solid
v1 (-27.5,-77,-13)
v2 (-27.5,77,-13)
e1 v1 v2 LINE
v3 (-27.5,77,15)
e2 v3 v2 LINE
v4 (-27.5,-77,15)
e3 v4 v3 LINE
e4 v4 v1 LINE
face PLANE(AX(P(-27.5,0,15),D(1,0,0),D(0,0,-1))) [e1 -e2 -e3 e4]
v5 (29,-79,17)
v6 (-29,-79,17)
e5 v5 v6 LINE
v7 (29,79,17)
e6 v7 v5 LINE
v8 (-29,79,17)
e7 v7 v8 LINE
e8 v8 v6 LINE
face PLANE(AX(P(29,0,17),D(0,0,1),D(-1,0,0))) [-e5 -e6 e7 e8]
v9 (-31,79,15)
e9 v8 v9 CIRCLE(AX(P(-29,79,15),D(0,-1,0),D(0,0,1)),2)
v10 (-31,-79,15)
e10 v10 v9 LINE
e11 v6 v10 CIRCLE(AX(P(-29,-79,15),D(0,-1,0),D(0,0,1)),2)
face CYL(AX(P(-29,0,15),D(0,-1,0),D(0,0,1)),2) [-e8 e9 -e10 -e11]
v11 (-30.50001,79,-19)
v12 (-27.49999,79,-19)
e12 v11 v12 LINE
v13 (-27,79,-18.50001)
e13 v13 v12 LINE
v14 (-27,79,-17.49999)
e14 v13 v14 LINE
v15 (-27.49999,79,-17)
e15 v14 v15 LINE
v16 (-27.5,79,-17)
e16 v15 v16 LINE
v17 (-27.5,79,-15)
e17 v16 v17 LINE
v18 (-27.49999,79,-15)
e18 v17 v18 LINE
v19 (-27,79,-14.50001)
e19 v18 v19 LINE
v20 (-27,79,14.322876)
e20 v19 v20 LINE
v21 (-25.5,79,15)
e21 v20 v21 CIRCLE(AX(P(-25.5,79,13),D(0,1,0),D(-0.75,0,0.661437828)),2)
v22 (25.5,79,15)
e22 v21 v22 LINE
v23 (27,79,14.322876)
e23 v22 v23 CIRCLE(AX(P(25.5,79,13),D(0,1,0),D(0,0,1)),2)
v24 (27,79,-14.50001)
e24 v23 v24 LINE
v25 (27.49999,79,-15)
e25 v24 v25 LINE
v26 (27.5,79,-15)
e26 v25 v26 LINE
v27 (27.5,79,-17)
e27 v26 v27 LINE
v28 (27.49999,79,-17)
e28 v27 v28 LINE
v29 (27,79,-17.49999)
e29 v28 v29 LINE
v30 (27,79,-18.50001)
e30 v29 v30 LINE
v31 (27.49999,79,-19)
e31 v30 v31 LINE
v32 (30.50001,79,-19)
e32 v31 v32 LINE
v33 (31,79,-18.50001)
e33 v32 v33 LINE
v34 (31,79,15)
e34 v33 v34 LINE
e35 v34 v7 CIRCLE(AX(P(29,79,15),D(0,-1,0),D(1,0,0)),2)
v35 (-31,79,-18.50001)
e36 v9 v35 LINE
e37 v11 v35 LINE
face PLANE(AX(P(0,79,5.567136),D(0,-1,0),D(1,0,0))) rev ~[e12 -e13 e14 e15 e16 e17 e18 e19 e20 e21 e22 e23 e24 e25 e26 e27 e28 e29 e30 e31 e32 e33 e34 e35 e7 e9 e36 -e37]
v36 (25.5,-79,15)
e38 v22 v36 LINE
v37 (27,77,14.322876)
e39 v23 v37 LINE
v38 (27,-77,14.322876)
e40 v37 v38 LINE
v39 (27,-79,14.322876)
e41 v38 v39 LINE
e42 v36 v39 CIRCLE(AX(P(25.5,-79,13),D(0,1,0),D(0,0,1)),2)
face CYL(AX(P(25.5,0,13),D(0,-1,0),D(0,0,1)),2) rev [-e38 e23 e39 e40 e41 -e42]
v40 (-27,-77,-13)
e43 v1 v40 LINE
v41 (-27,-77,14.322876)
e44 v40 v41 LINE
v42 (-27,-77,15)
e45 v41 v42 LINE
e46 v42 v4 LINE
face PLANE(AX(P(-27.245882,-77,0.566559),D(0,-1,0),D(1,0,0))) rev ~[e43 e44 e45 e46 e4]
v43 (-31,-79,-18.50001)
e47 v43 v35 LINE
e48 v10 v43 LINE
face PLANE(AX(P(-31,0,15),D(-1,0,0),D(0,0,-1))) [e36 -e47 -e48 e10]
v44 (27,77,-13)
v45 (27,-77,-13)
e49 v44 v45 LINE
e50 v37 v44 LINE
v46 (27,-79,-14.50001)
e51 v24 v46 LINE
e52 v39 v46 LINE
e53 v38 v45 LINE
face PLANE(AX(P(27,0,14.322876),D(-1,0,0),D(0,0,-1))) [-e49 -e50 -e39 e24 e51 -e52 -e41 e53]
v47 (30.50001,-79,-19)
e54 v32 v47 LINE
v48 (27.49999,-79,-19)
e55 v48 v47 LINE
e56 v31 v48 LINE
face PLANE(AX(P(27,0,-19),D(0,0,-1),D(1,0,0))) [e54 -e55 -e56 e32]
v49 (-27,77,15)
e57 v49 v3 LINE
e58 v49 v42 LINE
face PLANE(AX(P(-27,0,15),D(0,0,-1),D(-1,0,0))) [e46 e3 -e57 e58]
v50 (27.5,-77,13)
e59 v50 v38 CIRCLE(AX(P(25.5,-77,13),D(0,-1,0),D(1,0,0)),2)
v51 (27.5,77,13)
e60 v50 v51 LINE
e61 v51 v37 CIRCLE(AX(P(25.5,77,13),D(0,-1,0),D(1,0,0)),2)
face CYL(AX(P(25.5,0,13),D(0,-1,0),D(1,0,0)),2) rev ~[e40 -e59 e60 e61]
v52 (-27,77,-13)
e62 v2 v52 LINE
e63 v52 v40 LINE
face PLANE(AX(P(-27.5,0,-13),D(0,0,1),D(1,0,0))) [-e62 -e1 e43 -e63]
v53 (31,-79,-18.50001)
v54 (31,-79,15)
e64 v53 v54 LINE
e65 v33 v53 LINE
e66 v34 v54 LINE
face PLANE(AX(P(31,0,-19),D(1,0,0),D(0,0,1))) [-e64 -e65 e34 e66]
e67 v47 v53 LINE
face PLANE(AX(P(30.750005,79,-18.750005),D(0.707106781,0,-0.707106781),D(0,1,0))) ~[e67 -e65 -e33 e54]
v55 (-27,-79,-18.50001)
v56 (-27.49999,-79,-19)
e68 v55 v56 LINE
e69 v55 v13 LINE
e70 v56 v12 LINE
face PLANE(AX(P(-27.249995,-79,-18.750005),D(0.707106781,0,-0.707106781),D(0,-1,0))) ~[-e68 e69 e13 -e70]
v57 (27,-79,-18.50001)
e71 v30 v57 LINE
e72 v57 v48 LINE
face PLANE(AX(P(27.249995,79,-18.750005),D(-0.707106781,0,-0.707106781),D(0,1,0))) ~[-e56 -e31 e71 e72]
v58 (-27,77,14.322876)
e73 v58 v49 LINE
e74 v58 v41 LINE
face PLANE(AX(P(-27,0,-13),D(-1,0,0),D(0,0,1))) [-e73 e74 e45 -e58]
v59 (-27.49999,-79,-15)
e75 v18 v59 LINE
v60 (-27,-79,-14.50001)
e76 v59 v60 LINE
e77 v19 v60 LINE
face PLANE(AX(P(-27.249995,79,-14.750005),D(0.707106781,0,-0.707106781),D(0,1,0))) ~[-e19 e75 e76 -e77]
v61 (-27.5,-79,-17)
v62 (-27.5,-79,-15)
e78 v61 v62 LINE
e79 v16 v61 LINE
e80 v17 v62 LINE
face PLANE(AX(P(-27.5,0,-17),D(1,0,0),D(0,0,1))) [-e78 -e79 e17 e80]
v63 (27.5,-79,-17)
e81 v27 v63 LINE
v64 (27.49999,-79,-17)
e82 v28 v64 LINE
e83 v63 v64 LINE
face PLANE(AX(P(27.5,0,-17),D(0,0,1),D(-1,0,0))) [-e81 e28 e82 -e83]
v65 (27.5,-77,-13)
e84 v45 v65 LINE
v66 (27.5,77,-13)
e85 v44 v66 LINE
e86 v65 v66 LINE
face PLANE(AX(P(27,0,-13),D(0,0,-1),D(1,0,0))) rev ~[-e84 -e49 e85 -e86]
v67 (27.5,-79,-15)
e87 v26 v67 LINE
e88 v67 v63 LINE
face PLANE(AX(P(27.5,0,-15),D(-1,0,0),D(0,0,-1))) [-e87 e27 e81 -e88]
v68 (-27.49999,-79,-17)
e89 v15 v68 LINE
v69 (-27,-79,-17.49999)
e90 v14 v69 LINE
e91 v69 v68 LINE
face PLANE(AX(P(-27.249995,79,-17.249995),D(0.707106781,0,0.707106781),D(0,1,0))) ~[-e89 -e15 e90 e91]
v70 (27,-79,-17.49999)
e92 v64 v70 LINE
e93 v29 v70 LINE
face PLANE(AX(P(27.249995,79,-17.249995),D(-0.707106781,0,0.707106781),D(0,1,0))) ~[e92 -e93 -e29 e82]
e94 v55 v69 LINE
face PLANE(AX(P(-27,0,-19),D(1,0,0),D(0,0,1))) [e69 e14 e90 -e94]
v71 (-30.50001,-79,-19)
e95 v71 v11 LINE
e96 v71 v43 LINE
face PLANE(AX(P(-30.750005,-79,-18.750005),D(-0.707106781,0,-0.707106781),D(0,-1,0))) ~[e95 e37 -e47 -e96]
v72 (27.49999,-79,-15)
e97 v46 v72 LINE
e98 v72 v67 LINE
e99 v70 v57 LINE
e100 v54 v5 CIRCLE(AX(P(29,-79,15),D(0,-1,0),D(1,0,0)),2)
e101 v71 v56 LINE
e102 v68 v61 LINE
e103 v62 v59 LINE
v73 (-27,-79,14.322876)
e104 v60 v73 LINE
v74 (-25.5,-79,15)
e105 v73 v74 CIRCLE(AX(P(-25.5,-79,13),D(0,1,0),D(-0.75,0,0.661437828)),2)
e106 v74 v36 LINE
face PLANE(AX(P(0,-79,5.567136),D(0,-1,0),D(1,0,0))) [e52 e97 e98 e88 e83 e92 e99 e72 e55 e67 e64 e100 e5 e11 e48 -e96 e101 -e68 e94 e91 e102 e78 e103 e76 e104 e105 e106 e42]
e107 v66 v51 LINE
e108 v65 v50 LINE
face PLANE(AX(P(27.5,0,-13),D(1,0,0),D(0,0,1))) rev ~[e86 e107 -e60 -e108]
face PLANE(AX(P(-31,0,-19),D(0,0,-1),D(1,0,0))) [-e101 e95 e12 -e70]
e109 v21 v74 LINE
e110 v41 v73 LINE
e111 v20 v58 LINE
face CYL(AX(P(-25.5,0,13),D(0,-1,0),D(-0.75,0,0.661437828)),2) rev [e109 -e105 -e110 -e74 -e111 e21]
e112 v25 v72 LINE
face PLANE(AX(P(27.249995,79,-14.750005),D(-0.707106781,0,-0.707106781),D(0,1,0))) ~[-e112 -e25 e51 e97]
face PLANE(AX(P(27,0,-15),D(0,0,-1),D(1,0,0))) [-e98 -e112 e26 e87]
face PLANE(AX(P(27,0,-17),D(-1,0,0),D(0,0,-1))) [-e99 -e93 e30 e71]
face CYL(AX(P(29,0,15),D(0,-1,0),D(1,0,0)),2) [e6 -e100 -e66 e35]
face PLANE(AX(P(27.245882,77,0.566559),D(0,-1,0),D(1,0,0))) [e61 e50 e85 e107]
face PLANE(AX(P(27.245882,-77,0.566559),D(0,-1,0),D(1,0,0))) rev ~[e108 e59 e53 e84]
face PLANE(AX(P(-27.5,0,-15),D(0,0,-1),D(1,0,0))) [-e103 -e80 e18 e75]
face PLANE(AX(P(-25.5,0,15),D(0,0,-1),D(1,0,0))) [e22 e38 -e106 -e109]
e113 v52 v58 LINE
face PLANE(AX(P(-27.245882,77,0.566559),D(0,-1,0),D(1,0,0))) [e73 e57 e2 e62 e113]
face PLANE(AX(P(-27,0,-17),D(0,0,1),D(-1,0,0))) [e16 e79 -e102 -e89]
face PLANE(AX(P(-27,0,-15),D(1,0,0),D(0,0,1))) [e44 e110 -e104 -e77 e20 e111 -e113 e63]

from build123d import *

# Parameters (mm, degrees)
F2_W     = 0.5
F2_H     = 2
F3_DEPTH = 79
F4_DEPTH = 77
F5_SIZE  = 0.49999


# Not quite as in the source:
# - a fillet or chamfer is up to 0.001 mm smaller than in the source, because OpenCascade refuses the exact size


with BuildPart() as f3:
    # F2 (on Front) → F3 (new body, symmetric)
    with BuildSketch(Plane.XZ):
        with BuildLine():
            Line((-27, -19), (-27, -17))
            Line((-27, -17), (-27.5, -17))
            Line((-27.5, -17), (-27.5, -15))
            Line((-27.5, -15), (-27.5, -13))
            Line((-27.5, -13), (-27.5, 13))
            Line((-27.5, 13), (-27.5, 15))
            Line((-27.5, 15), (-27, 15))
            Line((-27, 15), (-25.5, 15))
            Line((-25.5, 15), (0, 15))
            Line((0, 15), (25.5, 15))
            Line((25.5, 15), (27, 15))
            Line((27, 15), (27.5, 15))
            Line((27.5, 15), (27.5, 13))
            Line((27.5, 13), (27.5, -13))
            Line((27.5, -13), (27.5, -15))
            Line((27.5, -15), (27.5, -17))
            Line((27.5, -17), (27, -17))
            Line((27, -17), (27, -19))
            Line((27, -19), (31, -19))
            Line((31, -19), (31, 15))
            ThreePointArc((31, 15), (30.4142135624, 16.4142135624), (29, 17))
            Line((29, 17), (0, 17))
            Line((0, 17), (-29, 17))
            ThreePointArc((-29, 17), (-30.4142135624, 16.4142135624), (-31, 15))
            Line((-31, 15), (-31, -19))
            Line((-31, -19), (-27, -19))
        make_face()
        with Locations((-27.25, -14)):
            Rectangle(F2_W, F2_H)
        with BuildLine():
            Line((-27.5, 13), (-27.5, -13))
            Line((-27.5, -13), (-27, -13))
            Line((-27, -13), (-27, 14.3228756555))
            ThreePointArc((-27, 14.3228756555), (-27.3708286934, 13.7071067812), (-27.5, 13))
        make_face()
        with BuildLine():
            Line((-27.5, 15), (-27.5, 13))
            ThreePointArc((-27.5, 13), (-27.3708286934, 13.7071067812), (-27, 14.3228756555))
            Line((-27, 14.3228756555), (-27, 15))
            Line((-27, 15), (-27.5, 15))
        make_face()
        with BuildLine():
            Line((-27, 15), (-27, 14.3228756555))
            ThreePointArc((-27, 14.3228756555), (-26.3228756555, 14.8228756555), (-25.5, 15))
            Line((-25.5, 15), (-27, 15))
        make_face()
        with BuildLine():
            Line((27, 15), (25.5, 15))
            ThreePointArc((25.5, 15), (26.3228756555, 14.8228756555), (27, 14.3228756555))
            Line((27, 14.3228756555), (27, 15))
        make_face()
        with BuildLine():
            Line((27.5, 15), (27, 15))
            Line((27, 15), (27, 14.3228756555))
            ThreePointArc((27, 14.3228756555), (27.3708286934, 13.7071067812), (27.5, 13))
            Line((27.5, 13), (27.5, 15))
        make_face()
        with BuildLine():
            ThreePointArc((27.5, 13), (27.3708286934, 13.7071067812), (27, 14.3228756555))
            Line((27, 14.3228756555), (27, -13))
            Line((27, -13), (27.5, -13))
            Line((27.5, -13), (27.5, 13))
        make_face()
        with Locations((27.25, -14)):
            Rectangle(F2_W, F2_H)
    extrude(amount=F3_DEPTH, both=True)

    # F2 (on Front) → F4 (cut, symmetric)
    with BuildSketch(Plane.XZ):
        with BuildLine():
            Line((-27.5, 13), (-27.5, -13))
            Line((-27.5, -13), (-27, -13))
            Line((-27, -13), (-27, 14.3228756555))
            ThreePointArc((-27, 14.3228756555), (-27.3708286934, 13.7071067812), (-27.5, 13))
        make_face()
        with BuildLine():
            Line((-27.5, 15), (-27.5, 13))
            ThreePointArc((-27.5, 13), (-27.3708286934, 13.7071067812), (-27, 14.3228756555))
            Line((-27, 14.3228756555), (-27, 15))
            Line((-27, 15), (-27.5, 15))
        make_face()
        with BuildLine():
            ThreePointArc((27.5, 13), (27.3708286934, 13.7071067812), (27, 14.3228756555))
            Line((27, 14.3228756555), (27, -13))
            Line((27, -13), (27.5, -13))
            Line((27.5, -13), (27.5, 13))
        make_face()
    extrude(amount=F4_DEPTH, both=True, mode=Mode.SUBTRACT)

    # F5 (size 0.5 in the source; OpenCascade refuses exactly that, so slightly less here)
    f5_edges = [f3.edges().sort_by_distance(p)[0] for p in [
        (-27, 0, -17),
        (-27, 0, -15),
        (27, 0, -15),
        (27, 0, -17),
        (-27, 0, -19),
        (27, 0, -19),
        (-31, 0, -19),
        (31, 0, -19),
    ]]
    chamfer(f5_edges, length=F5_SIZE)


solid = f3.part
